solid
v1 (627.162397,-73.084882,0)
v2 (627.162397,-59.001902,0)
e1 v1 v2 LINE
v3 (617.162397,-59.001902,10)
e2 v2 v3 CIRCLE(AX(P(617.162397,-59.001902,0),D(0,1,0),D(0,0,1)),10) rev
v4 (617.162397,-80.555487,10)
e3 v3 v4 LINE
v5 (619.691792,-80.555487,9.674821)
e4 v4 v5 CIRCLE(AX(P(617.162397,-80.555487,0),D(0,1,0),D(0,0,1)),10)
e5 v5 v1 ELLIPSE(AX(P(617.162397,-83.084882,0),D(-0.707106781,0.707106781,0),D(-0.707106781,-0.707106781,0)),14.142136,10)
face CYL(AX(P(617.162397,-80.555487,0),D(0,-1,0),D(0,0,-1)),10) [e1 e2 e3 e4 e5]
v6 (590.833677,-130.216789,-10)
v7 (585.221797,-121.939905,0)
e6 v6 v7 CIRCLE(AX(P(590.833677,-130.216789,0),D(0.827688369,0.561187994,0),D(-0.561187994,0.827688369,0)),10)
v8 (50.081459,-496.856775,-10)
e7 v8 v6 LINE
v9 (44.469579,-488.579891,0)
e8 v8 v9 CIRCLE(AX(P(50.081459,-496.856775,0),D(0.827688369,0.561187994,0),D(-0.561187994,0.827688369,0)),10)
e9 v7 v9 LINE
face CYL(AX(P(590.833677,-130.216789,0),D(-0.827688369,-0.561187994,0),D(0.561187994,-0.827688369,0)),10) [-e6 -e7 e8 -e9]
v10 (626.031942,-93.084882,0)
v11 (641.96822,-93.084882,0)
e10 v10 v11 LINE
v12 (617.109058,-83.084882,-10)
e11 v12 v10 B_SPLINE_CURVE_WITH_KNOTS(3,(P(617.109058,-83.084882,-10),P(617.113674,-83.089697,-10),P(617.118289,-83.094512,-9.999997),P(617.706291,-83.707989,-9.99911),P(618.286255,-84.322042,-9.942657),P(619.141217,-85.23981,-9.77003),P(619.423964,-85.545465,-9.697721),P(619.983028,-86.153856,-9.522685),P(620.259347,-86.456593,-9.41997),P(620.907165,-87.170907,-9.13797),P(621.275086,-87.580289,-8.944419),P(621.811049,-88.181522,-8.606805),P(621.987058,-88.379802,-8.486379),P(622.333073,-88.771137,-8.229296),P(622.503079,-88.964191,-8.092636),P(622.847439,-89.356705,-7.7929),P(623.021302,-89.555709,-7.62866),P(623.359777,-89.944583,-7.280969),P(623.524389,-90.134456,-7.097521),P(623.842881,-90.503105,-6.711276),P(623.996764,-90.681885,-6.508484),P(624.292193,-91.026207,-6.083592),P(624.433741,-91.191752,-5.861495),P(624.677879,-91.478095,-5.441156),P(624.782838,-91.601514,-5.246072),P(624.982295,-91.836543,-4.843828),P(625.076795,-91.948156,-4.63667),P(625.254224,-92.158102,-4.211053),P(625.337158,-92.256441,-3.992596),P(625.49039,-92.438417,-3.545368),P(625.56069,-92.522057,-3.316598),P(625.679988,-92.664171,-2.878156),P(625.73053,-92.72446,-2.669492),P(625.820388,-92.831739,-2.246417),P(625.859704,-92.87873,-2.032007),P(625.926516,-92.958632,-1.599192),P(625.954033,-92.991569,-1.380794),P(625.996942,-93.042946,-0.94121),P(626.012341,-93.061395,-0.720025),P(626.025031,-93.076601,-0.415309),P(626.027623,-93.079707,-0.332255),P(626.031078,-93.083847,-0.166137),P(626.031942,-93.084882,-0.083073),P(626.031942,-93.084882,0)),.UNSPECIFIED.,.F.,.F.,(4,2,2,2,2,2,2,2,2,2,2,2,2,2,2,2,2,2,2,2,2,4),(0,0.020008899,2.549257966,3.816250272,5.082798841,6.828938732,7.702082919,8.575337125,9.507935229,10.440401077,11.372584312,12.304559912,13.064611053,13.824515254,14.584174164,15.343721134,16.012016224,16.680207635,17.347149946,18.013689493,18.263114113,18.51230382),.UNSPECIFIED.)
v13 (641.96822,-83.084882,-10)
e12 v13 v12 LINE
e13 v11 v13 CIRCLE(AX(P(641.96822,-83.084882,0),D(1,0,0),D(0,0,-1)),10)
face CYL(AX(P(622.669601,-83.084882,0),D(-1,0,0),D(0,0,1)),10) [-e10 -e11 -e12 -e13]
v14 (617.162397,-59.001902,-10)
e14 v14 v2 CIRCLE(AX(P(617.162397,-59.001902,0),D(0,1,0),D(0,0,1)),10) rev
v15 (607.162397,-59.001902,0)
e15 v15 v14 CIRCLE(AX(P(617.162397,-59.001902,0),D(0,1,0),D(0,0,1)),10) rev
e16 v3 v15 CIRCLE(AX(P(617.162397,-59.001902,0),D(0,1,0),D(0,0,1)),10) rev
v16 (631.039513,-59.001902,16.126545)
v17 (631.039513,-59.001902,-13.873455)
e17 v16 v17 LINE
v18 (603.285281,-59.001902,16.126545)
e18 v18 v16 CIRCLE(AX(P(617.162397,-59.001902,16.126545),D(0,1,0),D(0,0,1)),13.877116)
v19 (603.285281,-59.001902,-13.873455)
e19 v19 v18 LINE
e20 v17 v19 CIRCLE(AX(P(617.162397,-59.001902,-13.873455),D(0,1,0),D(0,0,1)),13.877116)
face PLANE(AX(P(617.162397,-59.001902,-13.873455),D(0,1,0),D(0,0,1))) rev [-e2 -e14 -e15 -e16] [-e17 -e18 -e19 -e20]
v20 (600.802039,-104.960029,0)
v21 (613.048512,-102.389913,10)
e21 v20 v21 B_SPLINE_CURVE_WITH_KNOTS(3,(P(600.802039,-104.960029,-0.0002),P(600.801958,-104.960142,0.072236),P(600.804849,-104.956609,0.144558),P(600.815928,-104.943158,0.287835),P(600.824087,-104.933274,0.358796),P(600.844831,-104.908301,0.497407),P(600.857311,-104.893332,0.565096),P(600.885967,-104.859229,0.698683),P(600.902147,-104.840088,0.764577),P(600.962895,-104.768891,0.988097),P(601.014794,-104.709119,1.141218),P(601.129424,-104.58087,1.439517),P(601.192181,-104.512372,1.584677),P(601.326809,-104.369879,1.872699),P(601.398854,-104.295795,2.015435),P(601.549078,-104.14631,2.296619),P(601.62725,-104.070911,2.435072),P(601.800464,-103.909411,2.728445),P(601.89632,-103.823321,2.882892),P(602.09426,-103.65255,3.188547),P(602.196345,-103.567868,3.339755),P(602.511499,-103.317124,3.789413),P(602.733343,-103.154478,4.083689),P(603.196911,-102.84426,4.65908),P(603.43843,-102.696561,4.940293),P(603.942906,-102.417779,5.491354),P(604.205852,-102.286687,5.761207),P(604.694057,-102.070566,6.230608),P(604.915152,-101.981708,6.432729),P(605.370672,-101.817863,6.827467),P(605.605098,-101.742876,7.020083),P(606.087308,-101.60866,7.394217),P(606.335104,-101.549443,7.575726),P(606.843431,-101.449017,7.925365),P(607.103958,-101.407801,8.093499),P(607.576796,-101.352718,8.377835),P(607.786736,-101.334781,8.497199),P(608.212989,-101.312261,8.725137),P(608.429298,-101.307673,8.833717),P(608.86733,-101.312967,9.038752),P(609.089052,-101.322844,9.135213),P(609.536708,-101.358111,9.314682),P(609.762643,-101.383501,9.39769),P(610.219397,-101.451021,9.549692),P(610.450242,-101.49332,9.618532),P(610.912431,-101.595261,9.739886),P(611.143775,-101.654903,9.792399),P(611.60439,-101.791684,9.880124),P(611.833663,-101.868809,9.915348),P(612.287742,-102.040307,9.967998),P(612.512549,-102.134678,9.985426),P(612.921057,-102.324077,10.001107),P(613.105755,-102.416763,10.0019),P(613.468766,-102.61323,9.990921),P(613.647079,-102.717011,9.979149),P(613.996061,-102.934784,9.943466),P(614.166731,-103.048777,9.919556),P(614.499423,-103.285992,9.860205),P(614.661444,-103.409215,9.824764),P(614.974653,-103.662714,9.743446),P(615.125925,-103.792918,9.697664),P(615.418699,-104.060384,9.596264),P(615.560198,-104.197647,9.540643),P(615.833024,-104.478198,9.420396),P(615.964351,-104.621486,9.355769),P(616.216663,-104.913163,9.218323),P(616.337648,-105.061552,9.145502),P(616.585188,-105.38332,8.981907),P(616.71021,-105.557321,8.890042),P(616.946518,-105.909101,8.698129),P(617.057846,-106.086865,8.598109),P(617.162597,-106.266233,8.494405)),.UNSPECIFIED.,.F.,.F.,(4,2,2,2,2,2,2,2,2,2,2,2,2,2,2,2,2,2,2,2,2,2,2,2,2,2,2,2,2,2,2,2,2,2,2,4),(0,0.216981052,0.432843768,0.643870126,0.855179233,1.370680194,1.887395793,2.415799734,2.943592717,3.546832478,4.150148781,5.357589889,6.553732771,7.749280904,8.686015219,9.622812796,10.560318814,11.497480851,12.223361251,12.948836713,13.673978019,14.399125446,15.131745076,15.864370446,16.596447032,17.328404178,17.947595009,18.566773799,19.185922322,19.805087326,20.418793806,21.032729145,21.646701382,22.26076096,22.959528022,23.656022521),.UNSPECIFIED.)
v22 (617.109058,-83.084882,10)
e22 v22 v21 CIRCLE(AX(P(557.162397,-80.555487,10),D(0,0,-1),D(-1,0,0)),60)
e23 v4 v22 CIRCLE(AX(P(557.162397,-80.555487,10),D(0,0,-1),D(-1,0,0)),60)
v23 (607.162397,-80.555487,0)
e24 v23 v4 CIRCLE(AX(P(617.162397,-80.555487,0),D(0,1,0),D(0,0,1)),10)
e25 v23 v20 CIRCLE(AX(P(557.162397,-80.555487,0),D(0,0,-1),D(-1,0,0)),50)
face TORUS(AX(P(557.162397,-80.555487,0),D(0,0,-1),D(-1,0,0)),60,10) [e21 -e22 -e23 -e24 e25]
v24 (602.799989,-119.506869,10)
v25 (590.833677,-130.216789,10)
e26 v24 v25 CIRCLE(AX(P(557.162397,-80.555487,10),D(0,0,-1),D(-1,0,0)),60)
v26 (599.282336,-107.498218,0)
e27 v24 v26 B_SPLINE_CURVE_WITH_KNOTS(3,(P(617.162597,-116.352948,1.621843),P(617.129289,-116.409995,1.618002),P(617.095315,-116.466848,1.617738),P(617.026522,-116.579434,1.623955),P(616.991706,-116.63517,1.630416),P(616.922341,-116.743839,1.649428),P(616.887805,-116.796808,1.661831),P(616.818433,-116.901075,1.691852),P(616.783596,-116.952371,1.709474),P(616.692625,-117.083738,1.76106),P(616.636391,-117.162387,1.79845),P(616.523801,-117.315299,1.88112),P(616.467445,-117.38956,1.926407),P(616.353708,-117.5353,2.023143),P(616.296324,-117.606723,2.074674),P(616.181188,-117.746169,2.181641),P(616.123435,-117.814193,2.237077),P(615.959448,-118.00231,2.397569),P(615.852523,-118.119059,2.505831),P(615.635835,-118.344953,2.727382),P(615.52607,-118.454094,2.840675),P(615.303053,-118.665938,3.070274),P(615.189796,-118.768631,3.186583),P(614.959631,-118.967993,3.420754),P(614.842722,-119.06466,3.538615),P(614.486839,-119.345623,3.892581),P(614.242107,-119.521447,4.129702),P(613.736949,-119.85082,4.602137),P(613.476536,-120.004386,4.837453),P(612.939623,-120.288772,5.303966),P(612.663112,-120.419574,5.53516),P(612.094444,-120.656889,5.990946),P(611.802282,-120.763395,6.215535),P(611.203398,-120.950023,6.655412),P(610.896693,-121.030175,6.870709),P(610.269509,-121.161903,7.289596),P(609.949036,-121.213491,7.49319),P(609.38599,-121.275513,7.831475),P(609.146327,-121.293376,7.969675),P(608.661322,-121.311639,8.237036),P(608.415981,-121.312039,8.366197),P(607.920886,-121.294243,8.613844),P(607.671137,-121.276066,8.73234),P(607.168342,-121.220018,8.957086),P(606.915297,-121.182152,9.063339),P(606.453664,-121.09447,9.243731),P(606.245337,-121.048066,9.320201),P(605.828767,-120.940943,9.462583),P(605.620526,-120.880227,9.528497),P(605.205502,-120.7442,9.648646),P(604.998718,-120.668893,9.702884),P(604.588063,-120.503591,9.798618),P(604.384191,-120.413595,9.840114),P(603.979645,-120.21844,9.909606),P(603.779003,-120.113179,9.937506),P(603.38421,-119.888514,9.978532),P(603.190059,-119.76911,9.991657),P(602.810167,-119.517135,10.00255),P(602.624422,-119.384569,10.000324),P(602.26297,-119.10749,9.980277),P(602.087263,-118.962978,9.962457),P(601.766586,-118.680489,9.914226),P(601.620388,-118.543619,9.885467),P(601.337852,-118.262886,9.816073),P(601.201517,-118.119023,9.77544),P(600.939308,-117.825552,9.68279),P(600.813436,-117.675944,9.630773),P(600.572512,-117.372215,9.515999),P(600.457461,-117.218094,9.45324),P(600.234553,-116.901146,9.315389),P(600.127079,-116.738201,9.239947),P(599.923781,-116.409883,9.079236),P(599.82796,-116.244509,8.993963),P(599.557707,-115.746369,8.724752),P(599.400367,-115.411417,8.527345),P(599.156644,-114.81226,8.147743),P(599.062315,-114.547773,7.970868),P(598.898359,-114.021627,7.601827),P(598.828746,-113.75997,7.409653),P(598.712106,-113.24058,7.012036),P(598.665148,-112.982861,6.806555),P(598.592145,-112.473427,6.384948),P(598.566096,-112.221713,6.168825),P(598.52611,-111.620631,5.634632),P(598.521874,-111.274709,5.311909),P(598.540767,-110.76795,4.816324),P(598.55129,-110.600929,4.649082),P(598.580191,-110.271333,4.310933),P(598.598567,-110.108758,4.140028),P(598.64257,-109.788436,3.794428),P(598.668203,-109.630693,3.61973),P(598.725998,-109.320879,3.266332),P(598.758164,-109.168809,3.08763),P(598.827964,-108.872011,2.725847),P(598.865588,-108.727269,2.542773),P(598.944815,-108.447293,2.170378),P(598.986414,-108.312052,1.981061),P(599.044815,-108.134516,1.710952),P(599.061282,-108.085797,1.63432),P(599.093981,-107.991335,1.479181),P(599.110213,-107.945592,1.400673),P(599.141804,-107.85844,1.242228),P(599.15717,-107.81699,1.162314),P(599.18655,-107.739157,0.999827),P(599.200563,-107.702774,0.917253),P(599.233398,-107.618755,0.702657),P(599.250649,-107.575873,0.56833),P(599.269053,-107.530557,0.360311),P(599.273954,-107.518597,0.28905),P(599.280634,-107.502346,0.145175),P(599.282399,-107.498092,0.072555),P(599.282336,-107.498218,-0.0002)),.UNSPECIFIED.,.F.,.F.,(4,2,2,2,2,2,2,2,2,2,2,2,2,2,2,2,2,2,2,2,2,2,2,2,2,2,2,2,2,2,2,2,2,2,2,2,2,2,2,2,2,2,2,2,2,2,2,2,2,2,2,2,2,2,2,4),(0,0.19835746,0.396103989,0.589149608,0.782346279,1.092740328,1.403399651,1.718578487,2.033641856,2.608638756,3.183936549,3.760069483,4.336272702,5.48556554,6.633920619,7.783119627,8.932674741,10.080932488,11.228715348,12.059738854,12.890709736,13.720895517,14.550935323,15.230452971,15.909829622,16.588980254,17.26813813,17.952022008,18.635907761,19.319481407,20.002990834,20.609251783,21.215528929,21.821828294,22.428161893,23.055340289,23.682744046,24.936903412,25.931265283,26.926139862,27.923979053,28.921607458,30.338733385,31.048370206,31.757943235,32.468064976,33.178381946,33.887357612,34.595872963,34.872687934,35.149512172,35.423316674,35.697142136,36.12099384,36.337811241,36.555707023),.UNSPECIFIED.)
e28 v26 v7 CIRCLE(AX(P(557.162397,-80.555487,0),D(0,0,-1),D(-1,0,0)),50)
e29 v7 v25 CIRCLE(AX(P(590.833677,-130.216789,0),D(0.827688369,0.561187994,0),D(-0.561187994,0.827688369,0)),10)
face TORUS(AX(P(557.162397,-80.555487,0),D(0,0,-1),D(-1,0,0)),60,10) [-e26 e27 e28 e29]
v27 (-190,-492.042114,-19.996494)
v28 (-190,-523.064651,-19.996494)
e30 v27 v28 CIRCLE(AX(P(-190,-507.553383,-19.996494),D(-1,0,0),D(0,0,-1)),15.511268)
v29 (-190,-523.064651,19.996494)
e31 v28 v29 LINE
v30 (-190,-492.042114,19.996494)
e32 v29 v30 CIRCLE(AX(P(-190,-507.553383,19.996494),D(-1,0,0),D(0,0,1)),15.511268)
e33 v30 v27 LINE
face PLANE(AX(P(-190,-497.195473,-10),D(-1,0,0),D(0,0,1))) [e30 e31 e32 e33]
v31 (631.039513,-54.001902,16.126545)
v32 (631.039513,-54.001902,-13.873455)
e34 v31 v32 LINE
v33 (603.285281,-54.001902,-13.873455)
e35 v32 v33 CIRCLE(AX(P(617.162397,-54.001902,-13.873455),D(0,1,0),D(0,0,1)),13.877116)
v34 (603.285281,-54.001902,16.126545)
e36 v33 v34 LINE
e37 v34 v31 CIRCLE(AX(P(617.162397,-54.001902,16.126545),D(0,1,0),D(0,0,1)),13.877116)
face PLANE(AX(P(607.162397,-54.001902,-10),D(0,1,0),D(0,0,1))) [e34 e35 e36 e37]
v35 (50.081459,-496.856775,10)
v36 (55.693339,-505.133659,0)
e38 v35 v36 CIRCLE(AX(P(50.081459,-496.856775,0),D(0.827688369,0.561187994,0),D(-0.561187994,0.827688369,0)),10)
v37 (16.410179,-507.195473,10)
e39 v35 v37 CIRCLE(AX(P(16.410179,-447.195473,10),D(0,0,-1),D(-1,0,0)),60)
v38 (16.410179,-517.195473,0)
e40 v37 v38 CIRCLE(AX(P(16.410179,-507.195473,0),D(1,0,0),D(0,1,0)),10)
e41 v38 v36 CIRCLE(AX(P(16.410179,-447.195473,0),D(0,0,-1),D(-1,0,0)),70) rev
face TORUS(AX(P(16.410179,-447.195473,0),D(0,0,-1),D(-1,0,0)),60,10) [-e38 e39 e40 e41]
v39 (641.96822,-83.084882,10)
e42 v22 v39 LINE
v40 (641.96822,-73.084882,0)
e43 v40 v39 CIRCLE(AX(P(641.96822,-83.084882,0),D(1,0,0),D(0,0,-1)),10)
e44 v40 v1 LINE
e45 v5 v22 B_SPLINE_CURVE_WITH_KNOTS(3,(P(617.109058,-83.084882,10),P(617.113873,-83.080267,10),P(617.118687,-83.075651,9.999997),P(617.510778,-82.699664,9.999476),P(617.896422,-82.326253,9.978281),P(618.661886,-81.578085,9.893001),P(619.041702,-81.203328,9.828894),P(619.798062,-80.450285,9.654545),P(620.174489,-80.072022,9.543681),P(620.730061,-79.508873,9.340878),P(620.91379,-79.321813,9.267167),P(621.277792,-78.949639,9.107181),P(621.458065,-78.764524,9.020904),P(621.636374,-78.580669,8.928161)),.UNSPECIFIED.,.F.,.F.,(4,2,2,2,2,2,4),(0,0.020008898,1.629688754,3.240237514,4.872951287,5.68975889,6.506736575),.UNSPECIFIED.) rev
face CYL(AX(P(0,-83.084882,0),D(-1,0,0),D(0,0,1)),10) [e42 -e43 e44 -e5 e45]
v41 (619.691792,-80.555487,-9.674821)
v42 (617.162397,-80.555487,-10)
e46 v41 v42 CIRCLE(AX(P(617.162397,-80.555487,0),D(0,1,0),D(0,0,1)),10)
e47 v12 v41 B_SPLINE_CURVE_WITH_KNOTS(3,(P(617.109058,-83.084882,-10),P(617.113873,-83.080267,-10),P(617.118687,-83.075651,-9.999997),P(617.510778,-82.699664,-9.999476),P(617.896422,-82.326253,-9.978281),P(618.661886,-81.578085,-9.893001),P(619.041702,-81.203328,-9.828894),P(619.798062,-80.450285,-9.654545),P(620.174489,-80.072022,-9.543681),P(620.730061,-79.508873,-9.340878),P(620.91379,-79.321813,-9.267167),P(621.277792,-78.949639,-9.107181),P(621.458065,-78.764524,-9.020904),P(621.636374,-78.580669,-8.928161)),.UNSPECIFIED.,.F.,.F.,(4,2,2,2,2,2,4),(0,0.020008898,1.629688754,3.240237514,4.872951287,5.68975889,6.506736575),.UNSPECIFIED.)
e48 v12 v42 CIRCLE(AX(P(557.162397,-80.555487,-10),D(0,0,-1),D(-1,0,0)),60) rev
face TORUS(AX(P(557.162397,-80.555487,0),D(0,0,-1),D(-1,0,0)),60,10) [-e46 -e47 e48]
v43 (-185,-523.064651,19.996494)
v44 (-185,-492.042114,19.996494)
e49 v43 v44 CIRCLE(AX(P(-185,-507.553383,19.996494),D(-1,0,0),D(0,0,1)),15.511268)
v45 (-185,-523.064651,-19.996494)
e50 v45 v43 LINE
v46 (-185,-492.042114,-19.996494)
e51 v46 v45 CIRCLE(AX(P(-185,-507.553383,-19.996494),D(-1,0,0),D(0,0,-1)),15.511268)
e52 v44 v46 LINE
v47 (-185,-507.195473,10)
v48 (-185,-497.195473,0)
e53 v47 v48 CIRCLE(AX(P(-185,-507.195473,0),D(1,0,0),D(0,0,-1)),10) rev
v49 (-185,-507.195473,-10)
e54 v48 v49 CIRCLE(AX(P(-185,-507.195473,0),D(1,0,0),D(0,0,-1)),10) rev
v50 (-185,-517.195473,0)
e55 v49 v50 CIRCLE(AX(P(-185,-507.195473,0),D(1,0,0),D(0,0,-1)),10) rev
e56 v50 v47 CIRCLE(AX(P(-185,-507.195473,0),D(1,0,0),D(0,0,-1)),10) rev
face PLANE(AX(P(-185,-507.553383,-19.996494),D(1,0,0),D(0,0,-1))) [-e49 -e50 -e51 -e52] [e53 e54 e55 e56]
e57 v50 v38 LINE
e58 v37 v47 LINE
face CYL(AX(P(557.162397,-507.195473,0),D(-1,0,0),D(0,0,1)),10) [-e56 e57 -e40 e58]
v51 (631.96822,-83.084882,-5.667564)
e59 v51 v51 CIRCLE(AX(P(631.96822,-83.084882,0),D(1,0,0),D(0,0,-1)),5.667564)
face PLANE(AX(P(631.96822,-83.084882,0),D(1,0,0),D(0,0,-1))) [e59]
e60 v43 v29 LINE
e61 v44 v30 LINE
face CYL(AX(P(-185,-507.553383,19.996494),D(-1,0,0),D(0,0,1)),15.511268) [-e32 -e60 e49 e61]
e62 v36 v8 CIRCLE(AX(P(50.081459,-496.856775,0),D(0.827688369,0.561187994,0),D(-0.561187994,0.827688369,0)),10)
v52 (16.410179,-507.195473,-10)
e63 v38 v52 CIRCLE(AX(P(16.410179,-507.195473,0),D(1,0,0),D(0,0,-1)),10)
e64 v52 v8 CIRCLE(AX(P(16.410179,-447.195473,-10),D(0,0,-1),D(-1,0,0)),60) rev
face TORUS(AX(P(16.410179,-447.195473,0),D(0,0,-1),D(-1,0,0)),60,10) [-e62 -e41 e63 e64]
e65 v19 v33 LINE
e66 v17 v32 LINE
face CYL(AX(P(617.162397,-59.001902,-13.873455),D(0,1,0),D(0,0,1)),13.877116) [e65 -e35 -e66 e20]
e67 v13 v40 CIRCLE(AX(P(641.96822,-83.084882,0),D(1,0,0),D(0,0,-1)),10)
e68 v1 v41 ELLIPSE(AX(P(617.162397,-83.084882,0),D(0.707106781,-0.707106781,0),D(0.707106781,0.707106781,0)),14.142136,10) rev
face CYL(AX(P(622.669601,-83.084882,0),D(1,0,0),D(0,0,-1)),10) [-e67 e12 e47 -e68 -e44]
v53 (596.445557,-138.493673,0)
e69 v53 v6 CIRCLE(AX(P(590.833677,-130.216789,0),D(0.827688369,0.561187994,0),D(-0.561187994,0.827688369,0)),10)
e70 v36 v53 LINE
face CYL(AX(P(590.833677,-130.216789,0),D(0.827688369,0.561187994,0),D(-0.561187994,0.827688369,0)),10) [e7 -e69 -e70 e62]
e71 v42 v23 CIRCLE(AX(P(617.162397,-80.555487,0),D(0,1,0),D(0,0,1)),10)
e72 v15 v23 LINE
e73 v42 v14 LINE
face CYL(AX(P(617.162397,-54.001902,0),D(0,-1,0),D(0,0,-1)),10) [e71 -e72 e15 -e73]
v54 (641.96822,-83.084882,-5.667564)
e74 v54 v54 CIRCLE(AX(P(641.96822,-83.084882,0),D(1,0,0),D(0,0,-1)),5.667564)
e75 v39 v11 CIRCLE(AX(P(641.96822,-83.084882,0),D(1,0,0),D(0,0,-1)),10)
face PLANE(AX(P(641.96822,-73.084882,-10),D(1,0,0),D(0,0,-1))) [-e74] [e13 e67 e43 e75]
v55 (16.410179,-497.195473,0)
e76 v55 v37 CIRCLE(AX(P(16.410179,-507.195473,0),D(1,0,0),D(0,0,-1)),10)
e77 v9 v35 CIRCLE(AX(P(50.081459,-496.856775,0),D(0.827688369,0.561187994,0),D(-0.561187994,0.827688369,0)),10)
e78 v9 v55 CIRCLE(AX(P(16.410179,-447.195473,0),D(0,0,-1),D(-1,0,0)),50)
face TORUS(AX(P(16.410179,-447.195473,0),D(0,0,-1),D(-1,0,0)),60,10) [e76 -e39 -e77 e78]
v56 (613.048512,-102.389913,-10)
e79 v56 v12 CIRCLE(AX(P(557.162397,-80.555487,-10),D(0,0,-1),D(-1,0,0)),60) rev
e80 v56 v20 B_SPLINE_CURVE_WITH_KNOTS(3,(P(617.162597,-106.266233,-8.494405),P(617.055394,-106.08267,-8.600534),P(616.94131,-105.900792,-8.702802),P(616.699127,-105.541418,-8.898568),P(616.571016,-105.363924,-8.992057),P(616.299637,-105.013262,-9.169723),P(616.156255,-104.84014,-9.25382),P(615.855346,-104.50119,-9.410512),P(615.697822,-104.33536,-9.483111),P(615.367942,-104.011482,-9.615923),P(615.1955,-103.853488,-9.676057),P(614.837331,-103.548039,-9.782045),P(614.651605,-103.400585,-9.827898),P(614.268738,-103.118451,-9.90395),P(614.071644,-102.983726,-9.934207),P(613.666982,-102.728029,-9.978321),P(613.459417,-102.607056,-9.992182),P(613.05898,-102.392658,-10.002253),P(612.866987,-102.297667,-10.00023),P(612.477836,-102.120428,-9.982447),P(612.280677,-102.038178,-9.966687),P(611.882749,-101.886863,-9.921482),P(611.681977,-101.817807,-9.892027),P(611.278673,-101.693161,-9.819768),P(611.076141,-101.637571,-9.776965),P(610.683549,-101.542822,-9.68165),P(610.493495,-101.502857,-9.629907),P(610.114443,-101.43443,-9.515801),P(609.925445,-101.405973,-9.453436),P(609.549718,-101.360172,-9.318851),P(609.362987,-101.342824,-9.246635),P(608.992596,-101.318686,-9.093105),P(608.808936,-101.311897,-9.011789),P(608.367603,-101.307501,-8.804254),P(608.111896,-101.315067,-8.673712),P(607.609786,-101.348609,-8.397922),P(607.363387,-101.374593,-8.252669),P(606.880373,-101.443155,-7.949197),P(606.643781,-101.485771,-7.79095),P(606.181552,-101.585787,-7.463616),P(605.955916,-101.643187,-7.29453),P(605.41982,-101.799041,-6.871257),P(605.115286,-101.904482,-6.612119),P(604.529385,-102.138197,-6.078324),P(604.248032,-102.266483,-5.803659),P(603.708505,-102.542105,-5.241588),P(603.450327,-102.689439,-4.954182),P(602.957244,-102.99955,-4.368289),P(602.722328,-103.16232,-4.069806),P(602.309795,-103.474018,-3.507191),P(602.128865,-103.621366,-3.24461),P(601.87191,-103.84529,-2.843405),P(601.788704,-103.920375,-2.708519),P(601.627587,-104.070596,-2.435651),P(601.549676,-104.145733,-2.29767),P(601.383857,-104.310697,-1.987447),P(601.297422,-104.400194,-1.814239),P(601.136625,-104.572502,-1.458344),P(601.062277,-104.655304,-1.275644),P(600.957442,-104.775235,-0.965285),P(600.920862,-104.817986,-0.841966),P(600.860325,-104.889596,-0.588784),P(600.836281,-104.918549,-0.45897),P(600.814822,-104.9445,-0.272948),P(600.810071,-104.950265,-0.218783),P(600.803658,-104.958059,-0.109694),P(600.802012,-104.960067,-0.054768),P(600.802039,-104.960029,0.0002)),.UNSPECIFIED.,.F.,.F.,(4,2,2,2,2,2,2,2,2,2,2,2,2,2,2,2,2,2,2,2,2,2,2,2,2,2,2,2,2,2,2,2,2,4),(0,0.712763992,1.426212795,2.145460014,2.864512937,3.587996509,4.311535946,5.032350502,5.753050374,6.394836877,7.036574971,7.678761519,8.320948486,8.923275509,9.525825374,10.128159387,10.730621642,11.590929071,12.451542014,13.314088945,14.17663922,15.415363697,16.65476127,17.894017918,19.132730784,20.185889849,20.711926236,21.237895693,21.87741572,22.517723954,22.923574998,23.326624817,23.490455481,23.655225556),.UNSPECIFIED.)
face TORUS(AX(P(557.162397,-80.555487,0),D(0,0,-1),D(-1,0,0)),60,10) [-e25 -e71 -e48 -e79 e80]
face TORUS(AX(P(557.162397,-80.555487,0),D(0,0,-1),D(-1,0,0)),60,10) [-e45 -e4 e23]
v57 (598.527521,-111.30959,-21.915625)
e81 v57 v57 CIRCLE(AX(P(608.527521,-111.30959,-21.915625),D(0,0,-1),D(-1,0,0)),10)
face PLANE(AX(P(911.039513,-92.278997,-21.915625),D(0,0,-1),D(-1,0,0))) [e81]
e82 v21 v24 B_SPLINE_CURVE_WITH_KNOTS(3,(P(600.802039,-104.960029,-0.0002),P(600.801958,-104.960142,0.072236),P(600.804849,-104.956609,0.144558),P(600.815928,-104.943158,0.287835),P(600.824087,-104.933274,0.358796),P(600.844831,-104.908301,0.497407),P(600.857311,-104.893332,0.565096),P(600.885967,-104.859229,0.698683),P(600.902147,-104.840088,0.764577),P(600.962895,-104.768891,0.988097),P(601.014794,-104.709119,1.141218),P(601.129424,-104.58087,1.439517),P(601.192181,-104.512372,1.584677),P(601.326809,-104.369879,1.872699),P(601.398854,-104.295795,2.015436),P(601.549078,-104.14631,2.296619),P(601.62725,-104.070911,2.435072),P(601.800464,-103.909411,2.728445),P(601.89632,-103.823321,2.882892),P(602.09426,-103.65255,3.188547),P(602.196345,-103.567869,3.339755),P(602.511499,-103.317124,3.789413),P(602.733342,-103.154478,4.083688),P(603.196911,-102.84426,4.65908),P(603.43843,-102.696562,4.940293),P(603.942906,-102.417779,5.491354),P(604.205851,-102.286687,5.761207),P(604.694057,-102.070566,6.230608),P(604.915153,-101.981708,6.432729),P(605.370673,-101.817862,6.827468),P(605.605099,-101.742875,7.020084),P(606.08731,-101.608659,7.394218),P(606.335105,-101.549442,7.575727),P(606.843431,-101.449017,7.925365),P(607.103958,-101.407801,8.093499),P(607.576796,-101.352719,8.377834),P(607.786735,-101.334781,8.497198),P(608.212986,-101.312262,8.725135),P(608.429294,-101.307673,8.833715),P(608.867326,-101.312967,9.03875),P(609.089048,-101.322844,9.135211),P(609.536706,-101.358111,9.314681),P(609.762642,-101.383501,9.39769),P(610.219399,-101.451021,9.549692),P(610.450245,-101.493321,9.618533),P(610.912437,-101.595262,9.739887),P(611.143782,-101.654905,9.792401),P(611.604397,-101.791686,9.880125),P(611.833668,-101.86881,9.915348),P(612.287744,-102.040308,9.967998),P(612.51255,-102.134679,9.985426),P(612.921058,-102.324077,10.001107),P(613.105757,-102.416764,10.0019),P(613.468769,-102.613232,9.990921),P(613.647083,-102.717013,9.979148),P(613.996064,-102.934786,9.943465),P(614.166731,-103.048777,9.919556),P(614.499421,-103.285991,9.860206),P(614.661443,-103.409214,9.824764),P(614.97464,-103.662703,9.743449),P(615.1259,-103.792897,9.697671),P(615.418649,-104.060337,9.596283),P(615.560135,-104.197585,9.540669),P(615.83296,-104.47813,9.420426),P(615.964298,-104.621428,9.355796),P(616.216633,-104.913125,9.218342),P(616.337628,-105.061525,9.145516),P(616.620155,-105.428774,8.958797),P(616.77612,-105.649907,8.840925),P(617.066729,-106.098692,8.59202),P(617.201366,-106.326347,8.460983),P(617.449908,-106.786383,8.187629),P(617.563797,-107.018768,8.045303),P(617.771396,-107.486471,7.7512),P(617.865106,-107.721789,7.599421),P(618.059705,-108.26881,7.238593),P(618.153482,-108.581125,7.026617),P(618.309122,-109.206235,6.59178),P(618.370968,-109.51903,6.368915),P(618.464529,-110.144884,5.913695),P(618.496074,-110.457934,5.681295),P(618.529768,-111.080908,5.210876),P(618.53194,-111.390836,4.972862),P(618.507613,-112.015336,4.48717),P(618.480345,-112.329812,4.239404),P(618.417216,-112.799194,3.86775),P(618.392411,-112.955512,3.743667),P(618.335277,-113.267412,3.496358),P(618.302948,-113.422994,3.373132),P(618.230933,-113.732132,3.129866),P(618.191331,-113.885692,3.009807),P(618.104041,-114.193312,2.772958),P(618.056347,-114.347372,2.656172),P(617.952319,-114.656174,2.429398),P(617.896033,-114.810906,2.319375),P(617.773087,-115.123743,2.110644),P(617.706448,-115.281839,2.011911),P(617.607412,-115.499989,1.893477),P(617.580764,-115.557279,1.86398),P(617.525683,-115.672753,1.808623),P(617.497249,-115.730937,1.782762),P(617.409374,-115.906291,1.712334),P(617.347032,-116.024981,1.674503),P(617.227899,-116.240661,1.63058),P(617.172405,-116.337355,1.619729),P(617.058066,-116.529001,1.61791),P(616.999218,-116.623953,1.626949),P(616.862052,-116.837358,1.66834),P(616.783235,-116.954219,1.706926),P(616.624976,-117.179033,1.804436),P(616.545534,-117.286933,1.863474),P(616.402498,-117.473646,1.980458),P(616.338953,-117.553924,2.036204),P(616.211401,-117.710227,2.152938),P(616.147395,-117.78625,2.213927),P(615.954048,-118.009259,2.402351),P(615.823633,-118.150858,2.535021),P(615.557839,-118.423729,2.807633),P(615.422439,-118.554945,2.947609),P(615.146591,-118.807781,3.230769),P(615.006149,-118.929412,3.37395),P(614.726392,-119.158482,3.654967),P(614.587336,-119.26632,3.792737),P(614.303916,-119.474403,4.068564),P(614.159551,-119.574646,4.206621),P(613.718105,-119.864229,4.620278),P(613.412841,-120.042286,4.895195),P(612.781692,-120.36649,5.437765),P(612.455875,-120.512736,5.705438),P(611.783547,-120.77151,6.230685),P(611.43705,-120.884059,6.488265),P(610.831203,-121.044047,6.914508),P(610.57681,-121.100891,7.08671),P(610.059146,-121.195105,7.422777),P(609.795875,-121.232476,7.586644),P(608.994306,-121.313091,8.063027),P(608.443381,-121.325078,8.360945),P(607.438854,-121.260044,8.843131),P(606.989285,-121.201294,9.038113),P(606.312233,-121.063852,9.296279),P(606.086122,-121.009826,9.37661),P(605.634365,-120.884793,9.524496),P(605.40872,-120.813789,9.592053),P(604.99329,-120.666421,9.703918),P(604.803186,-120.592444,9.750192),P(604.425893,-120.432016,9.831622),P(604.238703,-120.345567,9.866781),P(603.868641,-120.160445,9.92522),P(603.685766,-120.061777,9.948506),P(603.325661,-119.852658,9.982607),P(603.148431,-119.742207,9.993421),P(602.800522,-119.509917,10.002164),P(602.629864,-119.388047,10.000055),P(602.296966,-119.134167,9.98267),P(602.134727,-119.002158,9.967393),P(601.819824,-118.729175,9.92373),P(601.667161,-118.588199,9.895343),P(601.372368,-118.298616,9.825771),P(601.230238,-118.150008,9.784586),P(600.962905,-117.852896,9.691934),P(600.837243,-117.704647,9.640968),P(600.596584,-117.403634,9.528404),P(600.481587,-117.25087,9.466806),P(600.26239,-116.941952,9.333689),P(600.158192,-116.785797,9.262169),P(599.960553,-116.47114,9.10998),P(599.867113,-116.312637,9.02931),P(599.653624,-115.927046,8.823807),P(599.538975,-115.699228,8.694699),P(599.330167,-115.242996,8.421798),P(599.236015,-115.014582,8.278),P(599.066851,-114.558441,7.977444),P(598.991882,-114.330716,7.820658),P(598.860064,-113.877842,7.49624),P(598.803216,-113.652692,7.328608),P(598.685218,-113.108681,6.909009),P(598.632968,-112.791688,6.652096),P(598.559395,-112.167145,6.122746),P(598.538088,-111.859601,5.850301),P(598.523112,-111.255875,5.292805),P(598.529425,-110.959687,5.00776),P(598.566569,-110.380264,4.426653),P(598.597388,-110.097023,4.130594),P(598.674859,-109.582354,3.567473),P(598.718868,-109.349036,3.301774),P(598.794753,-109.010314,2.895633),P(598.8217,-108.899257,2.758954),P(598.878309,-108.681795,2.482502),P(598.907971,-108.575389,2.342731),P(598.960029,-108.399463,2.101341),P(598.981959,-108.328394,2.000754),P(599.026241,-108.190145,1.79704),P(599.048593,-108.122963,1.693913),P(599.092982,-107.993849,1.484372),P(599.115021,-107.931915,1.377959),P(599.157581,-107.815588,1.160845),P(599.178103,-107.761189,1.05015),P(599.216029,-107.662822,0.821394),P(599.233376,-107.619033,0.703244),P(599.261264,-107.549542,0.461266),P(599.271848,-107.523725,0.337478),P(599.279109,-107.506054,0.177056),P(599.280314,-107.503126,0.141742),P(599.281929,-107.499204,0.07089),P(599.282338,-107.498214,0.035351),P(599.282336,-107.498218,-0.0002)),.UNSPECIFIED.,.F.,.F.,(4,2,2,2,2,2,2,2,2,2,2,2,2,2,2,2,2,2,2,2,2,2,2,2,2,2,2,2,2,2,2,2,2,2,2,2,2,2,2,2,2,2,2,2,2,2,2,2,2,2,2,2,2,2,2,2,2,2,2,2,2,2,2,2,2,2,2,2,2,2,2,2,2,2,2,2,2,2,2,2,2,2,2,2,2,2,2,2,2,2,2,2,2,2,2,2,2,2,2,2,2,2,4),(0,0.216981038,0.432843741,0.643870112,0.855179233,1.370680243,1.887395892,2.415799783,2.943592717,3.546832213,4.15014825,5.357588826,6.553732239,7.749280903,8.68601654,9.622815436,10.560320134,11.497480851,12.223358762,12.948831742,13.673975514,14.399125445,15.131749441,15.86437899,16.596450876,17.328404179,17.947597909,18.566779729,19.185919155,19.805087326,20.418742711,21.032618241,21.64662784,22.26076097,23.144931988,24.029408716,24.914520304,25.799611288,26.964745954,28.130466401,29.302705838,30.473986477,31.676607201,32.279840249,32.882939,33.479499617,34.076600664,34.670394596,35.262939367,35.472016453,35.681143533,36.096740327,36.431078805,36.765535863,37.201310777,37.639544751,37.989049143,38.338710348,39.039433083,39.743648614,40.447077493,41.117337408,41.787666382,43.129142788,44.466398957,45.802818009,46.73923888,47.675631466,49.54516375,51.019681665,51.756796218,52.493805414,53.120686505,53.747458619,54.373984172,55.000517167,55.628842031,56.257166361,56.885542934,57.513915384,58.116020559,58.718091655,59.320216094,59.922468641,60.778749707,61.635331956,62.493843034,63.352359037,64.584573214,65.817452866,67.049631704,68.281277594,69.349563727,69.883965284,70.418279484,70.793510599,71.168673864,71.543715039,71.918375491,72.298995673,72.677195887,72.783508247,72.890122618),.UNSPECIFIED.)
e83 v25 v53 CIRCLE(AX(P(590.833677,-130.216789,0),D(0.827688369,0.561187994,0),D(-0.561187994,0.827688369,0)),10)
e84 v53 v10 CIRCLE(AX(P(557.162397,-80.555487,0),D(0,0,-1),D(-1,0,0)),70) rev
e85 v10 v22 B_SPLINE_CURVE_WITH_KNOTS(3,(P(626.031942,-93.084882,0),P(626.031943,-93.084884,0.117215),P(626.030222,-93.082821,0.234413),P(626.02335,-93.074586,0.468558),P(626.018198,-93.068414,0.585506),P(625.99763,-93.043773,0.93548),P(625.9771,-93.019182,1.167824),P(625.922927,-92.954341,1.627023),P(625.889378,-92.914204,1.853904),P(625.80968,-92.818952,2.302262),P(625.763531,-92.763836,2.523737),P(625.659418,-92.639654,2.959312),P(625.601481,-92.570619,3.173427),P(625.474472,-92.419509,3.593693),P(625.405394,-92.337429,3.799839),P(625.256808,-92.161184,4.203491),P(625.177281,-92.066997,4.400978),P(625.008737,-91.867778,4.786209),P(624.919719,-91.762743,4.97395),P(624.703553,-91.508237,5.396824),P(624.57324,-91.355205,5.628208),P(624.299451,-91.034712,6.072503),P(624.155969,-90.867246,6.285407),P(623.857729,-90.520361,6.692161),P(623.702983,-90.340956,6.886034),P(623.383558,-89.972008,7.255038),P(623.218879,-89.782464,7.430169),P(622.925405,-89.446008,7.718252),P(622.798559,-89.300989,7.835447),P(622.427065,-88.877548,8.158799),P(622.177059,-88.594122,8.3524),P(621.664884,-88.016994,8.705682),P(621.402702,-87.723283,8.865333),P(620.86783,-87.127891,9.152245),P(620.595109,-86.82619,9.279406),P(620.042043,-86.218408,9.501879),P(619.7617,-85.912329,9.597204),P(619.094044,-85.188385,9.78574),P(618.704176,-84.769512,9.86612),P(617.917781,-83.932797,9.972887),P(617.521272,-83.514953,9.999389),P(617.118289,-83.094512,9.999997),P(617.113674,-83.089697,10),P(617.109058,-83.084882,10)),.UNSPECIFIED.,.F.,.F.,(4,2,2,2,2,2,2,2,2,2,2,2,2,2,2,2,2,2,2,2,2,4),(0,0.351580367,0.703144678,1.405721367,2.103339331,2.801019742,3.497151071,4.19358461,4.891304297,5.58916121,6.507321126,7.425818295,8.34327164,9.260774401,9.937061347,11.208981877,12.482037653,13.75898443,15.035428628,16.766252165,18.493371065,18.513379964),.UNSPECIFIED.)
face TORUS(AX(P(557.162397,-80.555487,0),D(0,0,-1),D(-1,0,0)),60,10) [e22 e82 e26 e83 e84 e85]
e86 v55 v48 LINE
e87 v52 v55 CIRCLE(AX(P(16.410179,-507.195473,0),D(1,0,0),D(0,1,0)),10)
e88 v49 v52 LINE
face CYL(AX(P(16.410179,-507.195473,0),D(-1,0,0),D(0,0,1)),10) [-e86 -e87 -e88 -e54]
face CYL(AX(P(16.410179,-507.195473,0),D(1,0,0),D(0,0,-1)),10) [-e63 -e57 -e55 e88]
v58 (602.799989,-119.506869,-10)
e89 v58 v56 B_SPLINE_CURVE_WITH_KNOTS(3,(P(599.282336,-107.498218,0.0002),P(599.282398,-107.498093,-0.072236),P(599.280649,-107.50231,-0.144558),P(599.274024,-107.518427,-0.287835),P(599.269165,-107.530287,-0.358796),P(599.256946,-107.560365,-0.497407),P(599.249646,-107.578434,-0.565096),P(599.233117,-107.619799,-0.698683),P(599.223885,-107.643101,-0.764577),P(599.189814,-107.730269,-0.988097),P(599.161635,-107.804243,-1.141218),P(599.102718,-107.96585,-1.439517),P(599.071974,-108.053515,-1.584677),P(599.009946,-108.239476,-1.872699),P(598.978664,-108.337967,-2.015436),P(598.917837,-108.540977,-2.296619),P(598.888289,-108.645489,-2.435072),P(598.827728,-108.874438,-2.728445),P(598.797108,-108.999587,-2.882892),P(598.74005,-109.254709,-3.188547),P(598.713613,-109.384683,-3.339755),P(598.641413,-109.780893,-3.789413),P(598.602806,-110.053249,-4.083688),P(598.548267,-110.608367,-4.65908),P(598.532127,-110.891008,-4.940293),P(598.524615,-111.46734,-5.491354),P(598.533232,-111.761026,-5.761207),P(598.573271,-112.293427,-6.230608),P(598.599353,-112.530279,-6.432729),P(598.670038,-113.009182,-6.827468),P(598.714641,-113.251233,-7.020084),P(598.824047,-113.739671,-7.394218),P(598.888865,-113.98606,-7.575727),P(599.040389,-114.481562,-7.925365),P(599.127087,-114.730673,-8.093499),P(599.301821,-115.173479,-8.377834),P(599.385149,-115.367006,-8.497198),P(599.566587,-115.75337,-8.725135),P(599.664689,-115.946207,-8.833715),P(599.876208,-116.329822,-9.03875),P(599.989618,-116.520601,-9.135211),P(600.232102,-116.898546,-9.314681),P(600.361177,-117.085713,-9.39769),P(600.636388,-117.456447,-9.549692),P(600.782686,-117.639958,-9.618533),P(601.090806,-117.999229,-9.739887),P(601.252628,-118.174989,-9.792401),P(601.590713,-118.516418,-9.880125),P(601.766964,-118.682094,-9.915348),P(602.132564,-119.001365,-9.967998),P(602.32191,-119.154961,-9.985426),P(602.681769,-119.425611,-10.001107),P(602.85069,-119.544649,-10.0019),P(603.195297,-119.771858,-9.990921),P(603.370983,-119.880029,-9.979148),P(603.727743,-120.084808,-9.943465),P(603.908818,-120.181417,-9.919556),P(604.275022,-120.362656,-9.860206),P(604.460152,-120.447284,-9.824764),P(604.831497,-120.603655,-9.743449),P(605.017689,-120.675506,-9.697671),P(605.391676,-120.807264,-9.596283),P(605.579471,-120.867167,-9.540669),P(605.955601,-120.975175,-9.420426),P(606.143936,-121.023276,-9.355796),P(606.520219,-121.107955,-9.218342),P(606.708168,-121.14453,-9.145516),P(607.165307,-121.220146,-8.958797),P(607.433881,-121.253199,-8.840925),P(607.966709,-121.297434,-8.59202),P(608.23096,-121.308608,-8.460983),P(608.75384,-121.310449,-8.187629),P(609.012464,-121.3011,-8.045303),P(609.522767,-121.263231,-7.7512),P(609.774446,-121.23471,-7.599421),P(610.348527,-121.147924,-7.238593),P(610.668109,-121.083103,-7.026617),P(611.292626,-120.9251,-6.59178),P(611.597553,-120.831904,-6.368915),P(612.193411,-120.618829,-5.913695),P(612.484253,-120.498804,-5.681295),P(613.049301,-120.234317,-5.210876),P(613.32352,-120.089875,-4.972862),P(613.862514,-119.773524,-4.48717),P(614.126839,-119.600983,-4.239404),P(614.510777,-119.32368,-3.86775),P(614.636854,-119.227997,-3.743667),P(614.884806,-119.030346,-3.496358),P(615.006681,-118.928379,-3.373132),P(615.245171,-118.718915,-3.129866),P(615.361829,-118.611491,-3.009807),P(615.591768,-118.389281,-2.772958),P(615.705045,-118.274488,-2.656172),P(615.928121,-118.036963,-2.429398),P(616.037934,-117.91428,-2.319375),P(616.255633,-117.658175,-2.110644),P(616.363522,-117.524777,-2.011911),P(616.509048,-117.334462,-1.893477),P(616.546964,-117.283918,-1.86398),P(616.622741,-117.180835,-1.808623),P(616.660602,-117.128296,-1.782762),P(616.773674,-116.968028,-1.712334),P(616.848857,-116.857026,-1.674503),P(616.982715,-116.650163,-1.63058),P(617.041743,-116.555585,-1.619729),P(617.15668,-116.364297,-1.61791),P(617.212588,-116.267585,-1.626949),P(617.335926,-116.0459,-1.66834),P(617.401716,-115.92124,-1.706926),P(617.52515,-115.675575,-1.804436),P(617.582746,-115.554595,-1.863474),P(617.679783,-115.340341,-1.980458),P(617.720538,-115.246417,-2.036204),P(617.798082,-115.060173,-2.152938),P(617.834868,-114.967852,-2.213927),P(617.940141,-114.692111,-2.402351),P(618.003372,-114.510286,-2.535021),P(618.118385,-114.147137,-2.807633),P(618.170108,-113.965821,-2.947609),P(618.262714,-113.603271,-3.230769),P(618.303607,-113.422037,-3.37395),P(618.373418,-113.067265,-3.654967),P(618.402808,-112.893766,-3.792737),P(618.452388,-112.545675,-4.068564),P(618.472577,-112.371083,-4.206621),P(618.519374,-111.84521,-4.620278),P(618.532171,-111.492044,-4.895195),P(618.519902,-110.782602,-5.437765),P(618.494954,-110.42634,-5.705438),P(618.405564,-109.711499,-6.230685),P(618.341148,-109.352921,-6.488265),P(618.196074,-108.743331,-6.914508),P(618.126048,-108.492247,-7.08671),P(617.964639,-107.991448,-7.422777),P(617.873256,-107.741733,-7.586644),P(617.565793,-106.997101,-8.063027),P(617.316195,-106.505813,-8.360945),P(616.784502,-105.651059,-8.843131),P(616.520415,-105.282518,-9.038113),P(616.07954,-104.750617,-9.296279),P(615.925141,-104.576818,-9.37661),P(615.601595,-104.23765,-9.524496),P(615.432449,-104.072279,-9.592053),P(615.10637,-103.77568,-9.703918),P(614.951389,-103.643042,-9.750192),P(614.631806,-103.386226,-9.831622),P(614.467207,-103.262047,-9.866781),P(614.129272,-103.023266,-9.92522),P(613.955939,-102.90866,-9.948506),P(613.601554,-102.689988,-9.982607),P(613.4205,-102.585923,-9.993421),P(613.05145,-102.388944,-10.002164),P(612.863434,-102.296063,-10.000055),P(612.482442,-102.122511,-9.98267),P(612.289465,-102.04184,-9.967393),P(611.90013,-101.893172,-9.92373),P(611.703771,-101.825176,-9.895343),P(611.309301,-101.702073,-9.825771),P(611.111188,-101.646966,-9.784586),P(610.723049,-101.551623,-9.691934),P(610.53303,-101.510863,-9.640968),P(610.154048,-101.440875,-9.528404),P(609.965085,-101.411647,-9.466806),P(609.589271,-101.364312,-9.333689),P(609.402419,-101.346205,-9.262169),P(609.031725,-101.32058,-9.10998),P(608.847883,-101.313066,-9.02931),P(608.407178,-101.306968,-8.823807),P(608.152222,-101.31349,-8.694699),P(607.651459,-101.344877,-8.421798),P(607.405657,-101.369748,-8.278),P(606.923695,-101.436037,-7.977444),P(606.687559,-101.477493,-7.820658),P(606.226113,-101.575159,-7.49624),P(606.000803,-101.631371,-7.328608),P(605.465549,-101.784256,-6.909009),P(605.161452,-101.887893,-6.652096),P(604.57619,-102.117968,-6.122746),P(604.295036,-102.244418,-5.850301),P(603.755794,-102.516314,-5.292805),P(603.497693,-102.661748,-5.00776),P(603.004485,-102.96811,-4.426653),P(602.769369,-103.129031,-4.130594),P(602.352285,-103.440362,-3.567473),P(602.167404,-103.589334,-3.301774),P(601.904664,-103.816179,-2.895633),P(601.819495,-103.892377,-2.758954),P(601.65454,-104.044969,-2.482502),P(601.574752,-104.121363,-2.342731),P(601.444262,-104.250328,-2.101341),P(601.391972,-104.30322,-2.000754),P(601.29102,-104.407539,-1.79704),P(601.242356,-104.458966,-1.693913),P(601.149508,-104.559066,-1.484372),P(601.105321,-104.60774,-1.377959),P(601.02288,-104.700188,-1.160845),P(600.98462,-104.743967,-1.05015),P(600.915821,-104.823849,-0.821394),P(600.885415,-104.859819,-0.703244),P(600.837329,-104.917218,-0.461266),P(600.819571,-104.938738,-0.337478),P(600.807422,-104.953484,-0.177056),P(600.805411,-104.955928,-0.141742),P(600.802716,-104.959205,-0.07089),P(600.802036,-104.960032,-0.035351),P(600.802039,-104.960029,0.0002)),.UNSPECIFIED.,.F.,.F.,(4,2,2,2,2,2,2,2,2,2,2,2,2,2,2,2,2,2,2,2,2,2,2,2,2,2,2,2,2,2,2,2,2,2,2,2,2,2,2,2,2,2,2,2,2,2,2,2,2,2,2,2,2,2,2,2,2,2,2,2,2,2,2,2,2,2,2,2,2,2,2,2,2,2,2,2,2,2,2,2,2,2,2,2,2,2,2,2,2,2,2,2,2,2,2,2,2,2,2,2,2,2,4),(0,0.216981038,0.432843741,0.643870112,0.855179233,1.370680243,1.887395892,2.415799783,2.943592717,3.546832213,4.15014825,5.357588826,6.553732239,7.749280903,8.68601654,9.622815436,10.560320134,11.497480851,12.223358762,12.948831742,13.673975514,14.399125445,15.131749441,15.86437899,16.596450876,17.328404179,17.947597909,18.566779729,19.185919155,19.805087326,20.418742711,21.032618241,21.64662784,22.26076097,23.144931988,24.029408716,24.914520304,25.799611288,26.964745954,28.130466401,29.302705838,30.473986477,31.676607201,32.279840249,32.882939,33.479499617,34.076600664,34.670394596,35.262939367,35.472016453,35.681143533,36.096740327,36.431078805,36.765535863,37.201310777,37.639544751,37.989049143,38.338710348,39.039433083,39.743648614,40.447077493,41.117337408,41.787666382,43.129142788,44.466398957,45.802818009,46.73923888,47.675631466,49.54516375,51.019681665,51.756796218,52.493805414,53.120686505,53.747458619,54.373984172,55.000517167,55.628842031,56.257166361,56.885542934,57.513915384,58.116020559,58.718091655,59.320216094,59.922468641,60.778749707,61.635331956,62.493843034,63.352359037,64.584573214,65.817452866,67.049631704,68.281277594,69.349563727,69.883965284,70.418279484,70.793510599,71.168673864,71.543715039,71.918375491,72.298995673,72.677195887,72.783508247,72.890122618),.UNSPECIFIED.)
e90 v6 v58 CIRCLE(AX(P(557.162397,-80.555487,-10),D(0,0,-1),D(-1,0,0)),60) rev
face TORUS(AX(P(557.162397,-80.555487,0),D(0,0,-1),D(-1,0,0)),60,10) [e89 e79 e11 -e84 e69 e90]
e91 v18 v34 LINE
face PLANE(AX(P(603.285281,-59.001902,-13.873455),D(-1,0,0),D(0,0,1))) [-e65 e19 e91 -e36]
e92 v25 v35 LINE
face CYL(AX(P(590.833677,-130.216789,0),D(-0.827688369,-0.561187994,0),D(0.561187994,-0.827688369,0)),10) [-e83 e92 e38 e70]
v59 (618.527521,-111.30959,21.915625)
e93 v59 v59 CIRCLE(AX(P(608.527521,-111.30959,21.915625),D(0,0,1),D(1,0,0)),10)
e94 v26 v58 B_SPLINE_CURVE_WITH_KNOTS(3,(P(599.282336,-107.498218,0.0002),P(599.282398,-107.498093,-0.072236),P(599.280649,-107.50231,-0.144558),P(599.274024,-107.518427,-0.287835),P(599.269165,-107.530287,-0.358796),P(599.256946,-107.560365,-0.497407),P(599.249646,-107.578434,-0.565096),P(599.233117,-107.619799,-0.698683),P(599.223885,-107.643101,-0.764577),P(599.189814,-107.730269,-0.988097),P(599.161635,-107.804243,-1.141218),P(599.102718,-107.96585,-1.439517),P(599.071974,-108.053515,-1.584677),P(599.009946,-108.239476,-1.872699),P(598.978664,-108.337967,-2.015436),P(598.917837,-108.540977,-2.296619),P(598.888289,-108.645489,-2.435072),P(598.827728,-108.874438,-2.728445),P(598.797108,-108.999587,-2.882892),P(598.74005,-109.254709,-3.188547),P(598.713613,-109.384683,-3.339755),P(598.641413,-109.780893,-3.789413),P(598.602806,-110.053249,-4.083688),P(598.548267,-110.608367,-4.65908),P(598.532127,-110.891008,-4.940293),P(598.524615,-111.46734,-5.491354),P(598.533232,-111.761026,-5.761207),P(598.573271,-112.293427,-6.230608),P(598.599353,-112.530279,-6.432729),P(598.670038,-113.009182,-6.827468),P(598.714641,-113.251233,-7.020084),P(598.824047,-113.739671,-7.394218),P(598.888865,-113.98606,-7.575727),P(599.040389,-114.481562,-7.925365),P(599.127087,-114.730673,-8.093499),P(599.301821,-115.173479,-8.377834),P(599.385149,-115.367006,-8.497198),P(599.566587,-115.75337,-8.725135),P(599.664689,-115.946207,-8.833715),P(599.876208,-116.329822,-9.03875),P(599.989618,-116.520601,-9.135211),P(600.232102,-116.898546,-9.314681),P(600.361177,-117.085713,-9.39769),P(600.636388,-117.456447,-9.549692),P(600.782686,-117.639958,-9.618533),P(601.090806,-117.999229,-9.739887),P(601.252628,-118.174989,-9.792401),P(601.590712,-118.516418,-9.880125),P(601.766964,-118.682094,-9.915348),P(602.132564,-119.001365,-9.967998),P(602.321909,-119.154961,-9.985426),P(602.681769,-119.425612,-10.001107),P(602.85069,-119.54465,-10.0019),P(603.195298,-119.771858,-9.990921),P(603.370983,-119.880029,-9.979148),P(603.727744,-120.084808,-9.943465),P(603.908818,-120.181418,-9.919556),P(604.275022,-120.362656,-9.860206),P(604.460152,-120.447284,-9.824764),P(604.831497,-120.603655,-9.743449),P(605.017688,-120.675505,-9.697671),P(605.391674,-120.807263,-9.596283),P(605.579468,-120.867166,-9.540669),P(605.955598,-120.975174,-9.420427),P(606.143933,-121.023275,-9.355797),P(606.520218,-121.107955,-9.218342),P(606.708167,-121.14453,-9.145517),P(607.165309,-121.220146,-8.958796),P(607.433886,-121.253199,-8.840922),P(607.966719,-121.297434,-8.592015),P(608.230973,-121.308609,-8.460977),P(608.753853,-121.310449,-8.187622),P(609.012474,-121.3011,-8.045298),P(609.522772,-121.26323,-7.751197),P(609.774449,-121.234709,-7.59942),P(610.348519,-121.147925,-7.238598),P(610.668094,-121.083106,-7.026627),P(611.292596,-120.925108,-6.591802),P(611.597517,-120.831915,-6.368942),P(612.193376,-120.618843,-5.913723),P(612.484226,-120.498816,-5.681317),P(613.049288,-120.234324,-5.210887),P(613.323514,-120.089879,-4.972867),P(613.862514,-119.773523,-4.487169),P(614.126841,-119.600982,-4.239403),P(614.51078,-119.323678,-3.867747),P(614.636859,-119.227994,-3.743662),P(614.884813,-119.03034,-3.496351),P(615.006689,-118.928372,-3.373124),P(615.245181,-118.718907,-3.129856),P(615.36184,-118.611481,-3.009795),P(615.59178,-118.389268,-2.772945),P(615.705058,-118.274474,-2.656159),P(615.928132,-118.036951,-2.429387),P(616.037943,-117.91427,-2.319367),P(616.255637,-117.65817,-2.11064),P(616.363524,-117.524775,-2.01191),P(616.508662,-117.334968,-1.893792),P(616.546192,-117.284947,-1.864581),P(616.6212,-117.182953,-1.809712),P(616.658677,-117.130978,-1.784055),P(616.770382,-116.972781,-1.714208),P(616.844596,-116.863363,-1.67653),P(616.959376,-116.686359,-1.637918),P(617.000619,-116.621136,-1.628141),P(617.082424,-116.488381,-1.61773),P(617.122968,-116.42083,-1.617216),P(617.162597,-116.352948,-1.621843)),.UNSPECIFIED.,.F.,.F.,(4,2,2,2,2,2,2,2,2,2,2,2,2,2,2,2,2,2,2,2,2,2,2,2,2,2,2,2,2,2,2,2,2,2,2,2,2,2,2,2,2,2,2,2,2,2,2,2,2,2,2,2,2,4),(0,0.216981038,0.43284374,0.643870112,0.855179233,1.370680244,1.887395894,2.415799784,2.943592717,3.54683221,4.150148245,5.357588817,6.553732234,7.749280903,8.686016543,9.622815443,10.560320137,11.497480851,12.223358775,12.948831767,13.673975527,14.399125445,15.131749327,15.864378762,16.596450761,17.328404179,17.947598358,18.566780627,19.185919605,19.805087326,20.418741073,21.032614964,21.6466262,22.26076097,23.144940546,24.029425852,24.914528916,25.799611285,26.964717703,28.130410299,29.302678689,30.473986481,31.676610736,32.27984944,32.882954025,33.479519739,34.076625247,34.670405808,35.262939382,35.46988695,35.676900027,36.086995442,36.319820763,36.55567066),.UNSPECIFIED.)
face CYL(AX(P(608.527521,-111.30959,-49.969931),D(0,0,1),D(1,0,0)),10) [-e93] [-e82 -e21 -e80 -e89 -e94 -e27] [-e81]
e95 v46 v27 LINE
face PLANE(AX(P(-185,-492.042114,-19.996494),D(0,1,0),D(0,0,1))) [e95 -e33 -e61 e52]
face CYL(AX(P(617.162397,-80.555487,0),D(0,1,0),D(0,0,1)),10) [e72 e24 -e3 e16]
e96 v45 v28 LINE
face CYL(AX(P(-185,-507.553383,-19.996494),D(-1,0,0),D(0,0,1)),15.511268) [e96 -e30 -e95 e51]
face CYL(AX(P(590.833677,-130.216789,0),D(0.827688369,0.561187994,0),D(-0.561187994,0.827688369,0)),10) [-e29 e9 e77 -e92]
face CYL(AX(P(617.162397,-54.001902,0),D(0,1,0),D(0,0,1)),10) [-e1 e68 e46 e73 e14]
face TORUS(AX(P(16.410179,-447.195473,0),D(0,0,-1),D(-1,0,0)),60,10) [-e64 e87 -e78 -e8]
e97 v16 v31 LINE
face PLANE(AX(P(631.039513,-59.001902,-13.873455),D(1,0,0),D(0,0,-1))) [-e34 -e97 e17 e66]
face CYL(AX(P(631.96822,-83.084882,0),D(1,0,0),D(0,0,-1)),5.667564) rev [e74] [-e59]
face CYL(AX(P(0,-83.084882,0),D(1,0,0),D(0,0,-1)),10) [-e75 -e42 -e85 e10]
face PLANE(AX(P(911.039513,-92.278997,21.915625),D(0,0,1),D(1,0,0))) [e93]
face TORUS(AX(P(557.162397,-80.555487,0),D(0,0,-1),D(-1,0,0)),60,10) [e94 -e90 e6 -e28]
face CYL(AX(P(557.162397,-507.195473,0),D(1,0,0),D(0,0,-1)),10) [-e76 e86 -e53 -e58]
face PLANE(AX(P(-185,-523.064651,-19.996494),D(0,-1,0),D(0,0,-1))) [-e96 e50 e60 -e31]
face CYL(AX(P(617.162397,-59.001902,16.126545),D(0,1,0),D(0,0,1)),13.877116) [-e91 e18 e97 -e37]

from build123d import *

# Parameters (mm, degrees)
BOSS_EXTRUDE1_DEPTH      = 10
BOSS_EXTRUDE1_DEPTH_BACK = 10
FILLET1_R                = 10
BOSS_EXTRUDE2_DEPTH      = 5
BOSS_EXTRUDE4_DEPTH      = 5
BOSS_EXTRUDE5_DEPTH      = 10
BOSS_EXTRUDE5_DEPTH_BACK = 10
SKETCH5_W                = 19.29861945
SKETCH5_H                = 20
FILLET2_R                = 10
SKETCH6_R                = 5.667563513
CUT_EXTRUDE1_DEPTH       = 10
BOSS_EXTRUDE6_REACH      = 969.104
SKETCH8_R                = 10
BOSS_EXTRUDE7_DEPTH      = 1019
CUT_EXTRUDE2_DEPTH       = 280
CUT_EXTRUDE2_DEPTH_BACK  = 1444
SKETCH9_W                = 1278.782045746
SKETCH9_H                = 255.439139792


with BuildPart() as part:
    # Sketch1 → Boss-Extrude1 (new, two sides: drawn at the far end of the back side and taken through both)
    with BuildSketch(Plane.XY.offset(-BOSS_EXTRUDE1_DEPTH_BACK)):
        with BuildLine():
            Line((607.162397096, -54.001902352), (607.162397096, -80.555486908))
            ThreePointArc((607.162397096, -80.555486908), (601.33801245, -103.975884173), (585.221796773, -121.93990535))
            Line((585.221796773, -121.93990535), (44.469579136, -488.579891421))
            ThreePointArc((44.469579136, -488.579891421), (31.086334914, -494.993071884), (16.410179458, -497.19547298))
            Line((16.410179458, -497.19547298), (-190, -497.19547298))
            Line((-190, -497.19547298), (-190, -517.19547298))
            Line((-190, -517.19547298), (16.410179458, -517.19547298))
            ThreePointArc((16.410179458, -517.19547298), (36.956797096, -514.112111446), (55.693339007, -505.133658798))
            Line((55.693339007, -505.133658798), (596.445556644, -138.493672726))
            ThreePointArc((596.445556644, -138.493672726), (619.008258592, -113.34404308), (627.162397096, -80.555486908))
            Line((627.162397096, -80.555486908), (627.162397096, -54.001902352))
            Line((627.162397096, -54.001902352), (607.162397096, -54.001902352))
        make_face()
    extrude(amount=BOSS_EXTRUDE1_DEPTH + BOSS_EXTRUDE1_DEPTH_BACK)

    # Fillet1
    fillet1_edges = [part.edges().sort_by_distance(p)[0] for p in [
        (627.162397096, -67.27869463, 10),
        (619.008258592, -113.34404308, 10),
        (326.069447825, -321.813665762, 10),
        (36.956797096, -514.112111446, 10),
        (627.162397096, -67.27869463, -10),
        (619.008258592, -113.34404308, -10),
        (326.069447825, -321.813665762, -10),
        (36.956797096, -514.112111446, -10),
        (607.162397096, -67.27869463, -10),
        (601.33801245, -103.975884173, -10),
        (314.845687955, -305.259898386, -10),
        (31.086334914, -494.993071884, -10),
        (607.162397096, -67.27869463, 10),
        (601.33801245, -103.975884173, 10),
        (314.845687955, -305.259898386, 10),
        (31.086334914, -494.993071884, 10),
        (-86.794910271, -517.19547298, 10),
        (-86.794910271, -517.19547298, -10),
        (-86.794910271, -497.19547298, -10),
        (-86.794910271, -497.19547298, 10),
    ]]
    fillet(fillet1_edges, radius=FILLET1_R - 0.0001)  # a hair under: the kernel refuses the full size

    # Sketch2 → Boss-Extrude2 (add)
    with BuildSketch(Plane.ZY.offset(190)):
        with BuildLine():
            Line((-19.996493956, -492.042114256), (19.996493956, -492.042114256))
            ThreePointArc((19.996493956, -492.042114256), (35.507762302, -507.553382602), (19.996493956, -523.064650948))
            Line((19.996493956, -523.064650948), (-19.996493956, -523.064650948))
            ThreePointArc((-19.996493956, -523.064650948), (-35.507762302, -507.553382602), (-19.996493956, -492.042114256))
        make_face()
    extrude(amount=-BOSS_EXTRUDE2_DEPTH)

    # Sketch4 → Boss-Extrude4 (add)
    with BuildSketch(Plane(origin=(0, -54.001902352, 0), x_dir=(1, 0, 0), z_dir=(0, 1, 0))):
        with BuildLine():
            Line((631.039513232, 13.873455475), (631.039513232, -16.126544525))
            ThreePointArc((631.039513232, -16.126544525), (617.162397096, -30.003660661), (603.28528096, -16.126544525))
            Line((603.28528096, -16.126544525), (603.28528096, 13.873455475))
            ThreePointArc((603.28528096, 13.873455475), (617.162397096, 27.75057161), (631.039513232, 13.873455475))
        make_face()
    extrude(amount=-BOSS_EXTRUDE4_DEPTH)

    # Sketch5 → Boss-Extrude5 (add, two sides: drawn at the far end of the back side and taken through both)
    with BuildSketch(Plane.XY.offset(-BOSS_EXTRUDE5_DEPTH_BACK)):
        with Locations((632.318910509, -83.084882275)):
            Rectangle(SKETCH5_W, SKETCH5_H)
    extrude(amount=BOSS_EXTRUDE5_DEPTH + BOSS_EXTRUDE5_DEPTH_BACK)

    # Fillet2
    fillet2_edges = [part.edges().sort_by_distance(p)[0] for p in [
        (632.318910509, -93.084882275, -10),
    ]]
    fillet(fillet2_edges, radius=FILLET2_R)
    fillet2_2_edges = [part.edges().sort_by_distance(p)[0] for p in [
        (632.318910509, -93.084882275, 10),
    ]]
    fillet(fillet2_2_edges, radius=FILLET2_R - 0.0001)  # a hair under: the kernel refuses the full size
    fillet2_3_edges = [part.edges().sort_by_distance(p)[0] for p in [
        (632.318910509, -73.084882275, -10),
    ]]
    fillet(fillet2_3_edges, radius=FILLET2_R - 0.0001)  # a hair under: the kernel refuses the full size
    fillet2_4_edges = [part.edges().sort_by_distance(p)[0] for p in [
        (632.318910509, -73.084882275, 10),
    ]]
    fillet(fillet2_4_edges, radius=FILLET2_R)

    # Sketch6 → Cut-Extrude1 (cut)
    with BuildSketch(Plane(origin=(641.968220234, 0, 0), x_dir=(0, 0, -1), z_dir=(1, 0, 0))):
        with Locations((0, -83.084882275)):
            Circle(SKETCH6_R)
    extrude(amount=-CUT_EXTRUDE1_DEPTH, mode=Mode.SUBTRACT)

    # Sketch7 → Boss-Extrude6 (add, up to next)
    with BuildSketch(Plane.ZY.offset(-622.669600784), mode=Mode.PRIVATE) as boss_extrude6_sk1:
        with BuildLine():
            Line((8.346898079, -77.577678587), (8.346898079, -80.555486908))
            add(Edge.make_bspline(
                [(8.346898079, -80.555486908), (8.346898079, -81.982172187), (8.316696448, -83.410187507), (8.220943403, -85.554432266), (8.180517355, -86.269555217), (8.105441743, -87.342875409), (8.077480522, -87.707593017), (8.016628456, -88.431395263), (7.983579243, -88.792907334), (7.947693147, -89.153998656)],
                knots=[0, 0, 0, 0, 0.5, 0.5, 0.75, 0.75, 0.875, 0.875, 1, 1, 1, 1], degree=3))
            ThreePointArc((7.947693147, -89.153998656), (9.473038886, -86.288245237), (10, -83.084882275))
            ThreePointArc((10, -83.084882275), (9.577812401, -80.209902344), (8.346898079, -77.577678587))
        make_face()
    boss_extrude6_tool1 = extrude(boss_extrude6_sk1.sketch, amount=BOSS_EXTRUDE6_REACH, mode=Mode.PRIVATE) - part.part
    # Sketch7 → Boss-Extrude6 (add, up to next)
    with BuildSketch(Plane.ZY.offset(-622.669600784), mode=Mode.PRIVATE) as boss_extrude6_sk2:
        with BuildLine():
            Line((-8.346898079, -80.555486908), (-8.346898079, -77.577678587))
            ThreePointArc((-8.346898079, -77.577678587), (-9.577812401, -80.209902344), (-10, -83.084882275))
            ThreePointArc((-10, -83.084882275), (-9.473038886, -86.288245237), (-7.947693147, -89.153998656))
            add(Edge.make_bspline(
                [(-7.947693147, -89.153998656), (-8.018512425, -88.441404381), (-8.078109125, -87.730146084), (-8.179099861, -86.293184501), (-8.219875886, -85.575121381), (-8.316449214, -83.42203878), (-8.346898079, -81.988108603), (-8.346898079, -80.555486908)],
                knots=[0, 0, 0, 0, 0.25, 0.25, 0.5, 0.5, 1, 1, 1, 1], degree=3))
        make_face()
    boss_extrude6_tool2 = extrude(boss_extrude6_sk2.sketch, amount=BOSS_EXTRUDE6_REACH, mode=Mode.PRIVATE) - part.part
    add(boss_extrude6_tool1.solids().sort_by_distance((622.669601, -83.365706, 8.954247))[0])
    add(boss_extrude6_tool2.solids().sort_by_distance((622.669601, -83.365642, -8.95425))[0])

    # Sketch8 → Boss-Extrude7 (add)
    with BuildSketch(Plane(origin=(199.991553268, -559.852678749, 969.030069289), x_dir=(-1, 0, 0), z_dir=(0, 0, -1))):
        with Locations((-408.53596746, 448.543088546)):
            Circle(SKETCH8_R)
    extrude(amount=BOSS_EXTRUDE7_DEPTH)

    # Sketch9 → Cut-Extrude2 (cut, two sides: drawn at the far end of the back side and taken through both)
    with BuildSketch(Plane(origin=(631.039513232, 0, 0), x_dir=(0, 0, -1), z_dir=(1, 0, 0)).offset(-CUT_EXTRUDE2_DEPTH_BACK)):
        with Locations((661.306648268, -219.998567208)):
            Rectangle(SKETCH9_W, SKETCH9_H)
        with Locations((-661.306648268, -219.998567208)):
            Rectangle(SKETCH9_W, SKETCH9_H)
    extrude(amount=CUT_EXTRUDE2_DEPTH + CUT_EXTRUDE2_DEPTH_BACK, mode=Mode.SUBTRACT)


solid = part.part
